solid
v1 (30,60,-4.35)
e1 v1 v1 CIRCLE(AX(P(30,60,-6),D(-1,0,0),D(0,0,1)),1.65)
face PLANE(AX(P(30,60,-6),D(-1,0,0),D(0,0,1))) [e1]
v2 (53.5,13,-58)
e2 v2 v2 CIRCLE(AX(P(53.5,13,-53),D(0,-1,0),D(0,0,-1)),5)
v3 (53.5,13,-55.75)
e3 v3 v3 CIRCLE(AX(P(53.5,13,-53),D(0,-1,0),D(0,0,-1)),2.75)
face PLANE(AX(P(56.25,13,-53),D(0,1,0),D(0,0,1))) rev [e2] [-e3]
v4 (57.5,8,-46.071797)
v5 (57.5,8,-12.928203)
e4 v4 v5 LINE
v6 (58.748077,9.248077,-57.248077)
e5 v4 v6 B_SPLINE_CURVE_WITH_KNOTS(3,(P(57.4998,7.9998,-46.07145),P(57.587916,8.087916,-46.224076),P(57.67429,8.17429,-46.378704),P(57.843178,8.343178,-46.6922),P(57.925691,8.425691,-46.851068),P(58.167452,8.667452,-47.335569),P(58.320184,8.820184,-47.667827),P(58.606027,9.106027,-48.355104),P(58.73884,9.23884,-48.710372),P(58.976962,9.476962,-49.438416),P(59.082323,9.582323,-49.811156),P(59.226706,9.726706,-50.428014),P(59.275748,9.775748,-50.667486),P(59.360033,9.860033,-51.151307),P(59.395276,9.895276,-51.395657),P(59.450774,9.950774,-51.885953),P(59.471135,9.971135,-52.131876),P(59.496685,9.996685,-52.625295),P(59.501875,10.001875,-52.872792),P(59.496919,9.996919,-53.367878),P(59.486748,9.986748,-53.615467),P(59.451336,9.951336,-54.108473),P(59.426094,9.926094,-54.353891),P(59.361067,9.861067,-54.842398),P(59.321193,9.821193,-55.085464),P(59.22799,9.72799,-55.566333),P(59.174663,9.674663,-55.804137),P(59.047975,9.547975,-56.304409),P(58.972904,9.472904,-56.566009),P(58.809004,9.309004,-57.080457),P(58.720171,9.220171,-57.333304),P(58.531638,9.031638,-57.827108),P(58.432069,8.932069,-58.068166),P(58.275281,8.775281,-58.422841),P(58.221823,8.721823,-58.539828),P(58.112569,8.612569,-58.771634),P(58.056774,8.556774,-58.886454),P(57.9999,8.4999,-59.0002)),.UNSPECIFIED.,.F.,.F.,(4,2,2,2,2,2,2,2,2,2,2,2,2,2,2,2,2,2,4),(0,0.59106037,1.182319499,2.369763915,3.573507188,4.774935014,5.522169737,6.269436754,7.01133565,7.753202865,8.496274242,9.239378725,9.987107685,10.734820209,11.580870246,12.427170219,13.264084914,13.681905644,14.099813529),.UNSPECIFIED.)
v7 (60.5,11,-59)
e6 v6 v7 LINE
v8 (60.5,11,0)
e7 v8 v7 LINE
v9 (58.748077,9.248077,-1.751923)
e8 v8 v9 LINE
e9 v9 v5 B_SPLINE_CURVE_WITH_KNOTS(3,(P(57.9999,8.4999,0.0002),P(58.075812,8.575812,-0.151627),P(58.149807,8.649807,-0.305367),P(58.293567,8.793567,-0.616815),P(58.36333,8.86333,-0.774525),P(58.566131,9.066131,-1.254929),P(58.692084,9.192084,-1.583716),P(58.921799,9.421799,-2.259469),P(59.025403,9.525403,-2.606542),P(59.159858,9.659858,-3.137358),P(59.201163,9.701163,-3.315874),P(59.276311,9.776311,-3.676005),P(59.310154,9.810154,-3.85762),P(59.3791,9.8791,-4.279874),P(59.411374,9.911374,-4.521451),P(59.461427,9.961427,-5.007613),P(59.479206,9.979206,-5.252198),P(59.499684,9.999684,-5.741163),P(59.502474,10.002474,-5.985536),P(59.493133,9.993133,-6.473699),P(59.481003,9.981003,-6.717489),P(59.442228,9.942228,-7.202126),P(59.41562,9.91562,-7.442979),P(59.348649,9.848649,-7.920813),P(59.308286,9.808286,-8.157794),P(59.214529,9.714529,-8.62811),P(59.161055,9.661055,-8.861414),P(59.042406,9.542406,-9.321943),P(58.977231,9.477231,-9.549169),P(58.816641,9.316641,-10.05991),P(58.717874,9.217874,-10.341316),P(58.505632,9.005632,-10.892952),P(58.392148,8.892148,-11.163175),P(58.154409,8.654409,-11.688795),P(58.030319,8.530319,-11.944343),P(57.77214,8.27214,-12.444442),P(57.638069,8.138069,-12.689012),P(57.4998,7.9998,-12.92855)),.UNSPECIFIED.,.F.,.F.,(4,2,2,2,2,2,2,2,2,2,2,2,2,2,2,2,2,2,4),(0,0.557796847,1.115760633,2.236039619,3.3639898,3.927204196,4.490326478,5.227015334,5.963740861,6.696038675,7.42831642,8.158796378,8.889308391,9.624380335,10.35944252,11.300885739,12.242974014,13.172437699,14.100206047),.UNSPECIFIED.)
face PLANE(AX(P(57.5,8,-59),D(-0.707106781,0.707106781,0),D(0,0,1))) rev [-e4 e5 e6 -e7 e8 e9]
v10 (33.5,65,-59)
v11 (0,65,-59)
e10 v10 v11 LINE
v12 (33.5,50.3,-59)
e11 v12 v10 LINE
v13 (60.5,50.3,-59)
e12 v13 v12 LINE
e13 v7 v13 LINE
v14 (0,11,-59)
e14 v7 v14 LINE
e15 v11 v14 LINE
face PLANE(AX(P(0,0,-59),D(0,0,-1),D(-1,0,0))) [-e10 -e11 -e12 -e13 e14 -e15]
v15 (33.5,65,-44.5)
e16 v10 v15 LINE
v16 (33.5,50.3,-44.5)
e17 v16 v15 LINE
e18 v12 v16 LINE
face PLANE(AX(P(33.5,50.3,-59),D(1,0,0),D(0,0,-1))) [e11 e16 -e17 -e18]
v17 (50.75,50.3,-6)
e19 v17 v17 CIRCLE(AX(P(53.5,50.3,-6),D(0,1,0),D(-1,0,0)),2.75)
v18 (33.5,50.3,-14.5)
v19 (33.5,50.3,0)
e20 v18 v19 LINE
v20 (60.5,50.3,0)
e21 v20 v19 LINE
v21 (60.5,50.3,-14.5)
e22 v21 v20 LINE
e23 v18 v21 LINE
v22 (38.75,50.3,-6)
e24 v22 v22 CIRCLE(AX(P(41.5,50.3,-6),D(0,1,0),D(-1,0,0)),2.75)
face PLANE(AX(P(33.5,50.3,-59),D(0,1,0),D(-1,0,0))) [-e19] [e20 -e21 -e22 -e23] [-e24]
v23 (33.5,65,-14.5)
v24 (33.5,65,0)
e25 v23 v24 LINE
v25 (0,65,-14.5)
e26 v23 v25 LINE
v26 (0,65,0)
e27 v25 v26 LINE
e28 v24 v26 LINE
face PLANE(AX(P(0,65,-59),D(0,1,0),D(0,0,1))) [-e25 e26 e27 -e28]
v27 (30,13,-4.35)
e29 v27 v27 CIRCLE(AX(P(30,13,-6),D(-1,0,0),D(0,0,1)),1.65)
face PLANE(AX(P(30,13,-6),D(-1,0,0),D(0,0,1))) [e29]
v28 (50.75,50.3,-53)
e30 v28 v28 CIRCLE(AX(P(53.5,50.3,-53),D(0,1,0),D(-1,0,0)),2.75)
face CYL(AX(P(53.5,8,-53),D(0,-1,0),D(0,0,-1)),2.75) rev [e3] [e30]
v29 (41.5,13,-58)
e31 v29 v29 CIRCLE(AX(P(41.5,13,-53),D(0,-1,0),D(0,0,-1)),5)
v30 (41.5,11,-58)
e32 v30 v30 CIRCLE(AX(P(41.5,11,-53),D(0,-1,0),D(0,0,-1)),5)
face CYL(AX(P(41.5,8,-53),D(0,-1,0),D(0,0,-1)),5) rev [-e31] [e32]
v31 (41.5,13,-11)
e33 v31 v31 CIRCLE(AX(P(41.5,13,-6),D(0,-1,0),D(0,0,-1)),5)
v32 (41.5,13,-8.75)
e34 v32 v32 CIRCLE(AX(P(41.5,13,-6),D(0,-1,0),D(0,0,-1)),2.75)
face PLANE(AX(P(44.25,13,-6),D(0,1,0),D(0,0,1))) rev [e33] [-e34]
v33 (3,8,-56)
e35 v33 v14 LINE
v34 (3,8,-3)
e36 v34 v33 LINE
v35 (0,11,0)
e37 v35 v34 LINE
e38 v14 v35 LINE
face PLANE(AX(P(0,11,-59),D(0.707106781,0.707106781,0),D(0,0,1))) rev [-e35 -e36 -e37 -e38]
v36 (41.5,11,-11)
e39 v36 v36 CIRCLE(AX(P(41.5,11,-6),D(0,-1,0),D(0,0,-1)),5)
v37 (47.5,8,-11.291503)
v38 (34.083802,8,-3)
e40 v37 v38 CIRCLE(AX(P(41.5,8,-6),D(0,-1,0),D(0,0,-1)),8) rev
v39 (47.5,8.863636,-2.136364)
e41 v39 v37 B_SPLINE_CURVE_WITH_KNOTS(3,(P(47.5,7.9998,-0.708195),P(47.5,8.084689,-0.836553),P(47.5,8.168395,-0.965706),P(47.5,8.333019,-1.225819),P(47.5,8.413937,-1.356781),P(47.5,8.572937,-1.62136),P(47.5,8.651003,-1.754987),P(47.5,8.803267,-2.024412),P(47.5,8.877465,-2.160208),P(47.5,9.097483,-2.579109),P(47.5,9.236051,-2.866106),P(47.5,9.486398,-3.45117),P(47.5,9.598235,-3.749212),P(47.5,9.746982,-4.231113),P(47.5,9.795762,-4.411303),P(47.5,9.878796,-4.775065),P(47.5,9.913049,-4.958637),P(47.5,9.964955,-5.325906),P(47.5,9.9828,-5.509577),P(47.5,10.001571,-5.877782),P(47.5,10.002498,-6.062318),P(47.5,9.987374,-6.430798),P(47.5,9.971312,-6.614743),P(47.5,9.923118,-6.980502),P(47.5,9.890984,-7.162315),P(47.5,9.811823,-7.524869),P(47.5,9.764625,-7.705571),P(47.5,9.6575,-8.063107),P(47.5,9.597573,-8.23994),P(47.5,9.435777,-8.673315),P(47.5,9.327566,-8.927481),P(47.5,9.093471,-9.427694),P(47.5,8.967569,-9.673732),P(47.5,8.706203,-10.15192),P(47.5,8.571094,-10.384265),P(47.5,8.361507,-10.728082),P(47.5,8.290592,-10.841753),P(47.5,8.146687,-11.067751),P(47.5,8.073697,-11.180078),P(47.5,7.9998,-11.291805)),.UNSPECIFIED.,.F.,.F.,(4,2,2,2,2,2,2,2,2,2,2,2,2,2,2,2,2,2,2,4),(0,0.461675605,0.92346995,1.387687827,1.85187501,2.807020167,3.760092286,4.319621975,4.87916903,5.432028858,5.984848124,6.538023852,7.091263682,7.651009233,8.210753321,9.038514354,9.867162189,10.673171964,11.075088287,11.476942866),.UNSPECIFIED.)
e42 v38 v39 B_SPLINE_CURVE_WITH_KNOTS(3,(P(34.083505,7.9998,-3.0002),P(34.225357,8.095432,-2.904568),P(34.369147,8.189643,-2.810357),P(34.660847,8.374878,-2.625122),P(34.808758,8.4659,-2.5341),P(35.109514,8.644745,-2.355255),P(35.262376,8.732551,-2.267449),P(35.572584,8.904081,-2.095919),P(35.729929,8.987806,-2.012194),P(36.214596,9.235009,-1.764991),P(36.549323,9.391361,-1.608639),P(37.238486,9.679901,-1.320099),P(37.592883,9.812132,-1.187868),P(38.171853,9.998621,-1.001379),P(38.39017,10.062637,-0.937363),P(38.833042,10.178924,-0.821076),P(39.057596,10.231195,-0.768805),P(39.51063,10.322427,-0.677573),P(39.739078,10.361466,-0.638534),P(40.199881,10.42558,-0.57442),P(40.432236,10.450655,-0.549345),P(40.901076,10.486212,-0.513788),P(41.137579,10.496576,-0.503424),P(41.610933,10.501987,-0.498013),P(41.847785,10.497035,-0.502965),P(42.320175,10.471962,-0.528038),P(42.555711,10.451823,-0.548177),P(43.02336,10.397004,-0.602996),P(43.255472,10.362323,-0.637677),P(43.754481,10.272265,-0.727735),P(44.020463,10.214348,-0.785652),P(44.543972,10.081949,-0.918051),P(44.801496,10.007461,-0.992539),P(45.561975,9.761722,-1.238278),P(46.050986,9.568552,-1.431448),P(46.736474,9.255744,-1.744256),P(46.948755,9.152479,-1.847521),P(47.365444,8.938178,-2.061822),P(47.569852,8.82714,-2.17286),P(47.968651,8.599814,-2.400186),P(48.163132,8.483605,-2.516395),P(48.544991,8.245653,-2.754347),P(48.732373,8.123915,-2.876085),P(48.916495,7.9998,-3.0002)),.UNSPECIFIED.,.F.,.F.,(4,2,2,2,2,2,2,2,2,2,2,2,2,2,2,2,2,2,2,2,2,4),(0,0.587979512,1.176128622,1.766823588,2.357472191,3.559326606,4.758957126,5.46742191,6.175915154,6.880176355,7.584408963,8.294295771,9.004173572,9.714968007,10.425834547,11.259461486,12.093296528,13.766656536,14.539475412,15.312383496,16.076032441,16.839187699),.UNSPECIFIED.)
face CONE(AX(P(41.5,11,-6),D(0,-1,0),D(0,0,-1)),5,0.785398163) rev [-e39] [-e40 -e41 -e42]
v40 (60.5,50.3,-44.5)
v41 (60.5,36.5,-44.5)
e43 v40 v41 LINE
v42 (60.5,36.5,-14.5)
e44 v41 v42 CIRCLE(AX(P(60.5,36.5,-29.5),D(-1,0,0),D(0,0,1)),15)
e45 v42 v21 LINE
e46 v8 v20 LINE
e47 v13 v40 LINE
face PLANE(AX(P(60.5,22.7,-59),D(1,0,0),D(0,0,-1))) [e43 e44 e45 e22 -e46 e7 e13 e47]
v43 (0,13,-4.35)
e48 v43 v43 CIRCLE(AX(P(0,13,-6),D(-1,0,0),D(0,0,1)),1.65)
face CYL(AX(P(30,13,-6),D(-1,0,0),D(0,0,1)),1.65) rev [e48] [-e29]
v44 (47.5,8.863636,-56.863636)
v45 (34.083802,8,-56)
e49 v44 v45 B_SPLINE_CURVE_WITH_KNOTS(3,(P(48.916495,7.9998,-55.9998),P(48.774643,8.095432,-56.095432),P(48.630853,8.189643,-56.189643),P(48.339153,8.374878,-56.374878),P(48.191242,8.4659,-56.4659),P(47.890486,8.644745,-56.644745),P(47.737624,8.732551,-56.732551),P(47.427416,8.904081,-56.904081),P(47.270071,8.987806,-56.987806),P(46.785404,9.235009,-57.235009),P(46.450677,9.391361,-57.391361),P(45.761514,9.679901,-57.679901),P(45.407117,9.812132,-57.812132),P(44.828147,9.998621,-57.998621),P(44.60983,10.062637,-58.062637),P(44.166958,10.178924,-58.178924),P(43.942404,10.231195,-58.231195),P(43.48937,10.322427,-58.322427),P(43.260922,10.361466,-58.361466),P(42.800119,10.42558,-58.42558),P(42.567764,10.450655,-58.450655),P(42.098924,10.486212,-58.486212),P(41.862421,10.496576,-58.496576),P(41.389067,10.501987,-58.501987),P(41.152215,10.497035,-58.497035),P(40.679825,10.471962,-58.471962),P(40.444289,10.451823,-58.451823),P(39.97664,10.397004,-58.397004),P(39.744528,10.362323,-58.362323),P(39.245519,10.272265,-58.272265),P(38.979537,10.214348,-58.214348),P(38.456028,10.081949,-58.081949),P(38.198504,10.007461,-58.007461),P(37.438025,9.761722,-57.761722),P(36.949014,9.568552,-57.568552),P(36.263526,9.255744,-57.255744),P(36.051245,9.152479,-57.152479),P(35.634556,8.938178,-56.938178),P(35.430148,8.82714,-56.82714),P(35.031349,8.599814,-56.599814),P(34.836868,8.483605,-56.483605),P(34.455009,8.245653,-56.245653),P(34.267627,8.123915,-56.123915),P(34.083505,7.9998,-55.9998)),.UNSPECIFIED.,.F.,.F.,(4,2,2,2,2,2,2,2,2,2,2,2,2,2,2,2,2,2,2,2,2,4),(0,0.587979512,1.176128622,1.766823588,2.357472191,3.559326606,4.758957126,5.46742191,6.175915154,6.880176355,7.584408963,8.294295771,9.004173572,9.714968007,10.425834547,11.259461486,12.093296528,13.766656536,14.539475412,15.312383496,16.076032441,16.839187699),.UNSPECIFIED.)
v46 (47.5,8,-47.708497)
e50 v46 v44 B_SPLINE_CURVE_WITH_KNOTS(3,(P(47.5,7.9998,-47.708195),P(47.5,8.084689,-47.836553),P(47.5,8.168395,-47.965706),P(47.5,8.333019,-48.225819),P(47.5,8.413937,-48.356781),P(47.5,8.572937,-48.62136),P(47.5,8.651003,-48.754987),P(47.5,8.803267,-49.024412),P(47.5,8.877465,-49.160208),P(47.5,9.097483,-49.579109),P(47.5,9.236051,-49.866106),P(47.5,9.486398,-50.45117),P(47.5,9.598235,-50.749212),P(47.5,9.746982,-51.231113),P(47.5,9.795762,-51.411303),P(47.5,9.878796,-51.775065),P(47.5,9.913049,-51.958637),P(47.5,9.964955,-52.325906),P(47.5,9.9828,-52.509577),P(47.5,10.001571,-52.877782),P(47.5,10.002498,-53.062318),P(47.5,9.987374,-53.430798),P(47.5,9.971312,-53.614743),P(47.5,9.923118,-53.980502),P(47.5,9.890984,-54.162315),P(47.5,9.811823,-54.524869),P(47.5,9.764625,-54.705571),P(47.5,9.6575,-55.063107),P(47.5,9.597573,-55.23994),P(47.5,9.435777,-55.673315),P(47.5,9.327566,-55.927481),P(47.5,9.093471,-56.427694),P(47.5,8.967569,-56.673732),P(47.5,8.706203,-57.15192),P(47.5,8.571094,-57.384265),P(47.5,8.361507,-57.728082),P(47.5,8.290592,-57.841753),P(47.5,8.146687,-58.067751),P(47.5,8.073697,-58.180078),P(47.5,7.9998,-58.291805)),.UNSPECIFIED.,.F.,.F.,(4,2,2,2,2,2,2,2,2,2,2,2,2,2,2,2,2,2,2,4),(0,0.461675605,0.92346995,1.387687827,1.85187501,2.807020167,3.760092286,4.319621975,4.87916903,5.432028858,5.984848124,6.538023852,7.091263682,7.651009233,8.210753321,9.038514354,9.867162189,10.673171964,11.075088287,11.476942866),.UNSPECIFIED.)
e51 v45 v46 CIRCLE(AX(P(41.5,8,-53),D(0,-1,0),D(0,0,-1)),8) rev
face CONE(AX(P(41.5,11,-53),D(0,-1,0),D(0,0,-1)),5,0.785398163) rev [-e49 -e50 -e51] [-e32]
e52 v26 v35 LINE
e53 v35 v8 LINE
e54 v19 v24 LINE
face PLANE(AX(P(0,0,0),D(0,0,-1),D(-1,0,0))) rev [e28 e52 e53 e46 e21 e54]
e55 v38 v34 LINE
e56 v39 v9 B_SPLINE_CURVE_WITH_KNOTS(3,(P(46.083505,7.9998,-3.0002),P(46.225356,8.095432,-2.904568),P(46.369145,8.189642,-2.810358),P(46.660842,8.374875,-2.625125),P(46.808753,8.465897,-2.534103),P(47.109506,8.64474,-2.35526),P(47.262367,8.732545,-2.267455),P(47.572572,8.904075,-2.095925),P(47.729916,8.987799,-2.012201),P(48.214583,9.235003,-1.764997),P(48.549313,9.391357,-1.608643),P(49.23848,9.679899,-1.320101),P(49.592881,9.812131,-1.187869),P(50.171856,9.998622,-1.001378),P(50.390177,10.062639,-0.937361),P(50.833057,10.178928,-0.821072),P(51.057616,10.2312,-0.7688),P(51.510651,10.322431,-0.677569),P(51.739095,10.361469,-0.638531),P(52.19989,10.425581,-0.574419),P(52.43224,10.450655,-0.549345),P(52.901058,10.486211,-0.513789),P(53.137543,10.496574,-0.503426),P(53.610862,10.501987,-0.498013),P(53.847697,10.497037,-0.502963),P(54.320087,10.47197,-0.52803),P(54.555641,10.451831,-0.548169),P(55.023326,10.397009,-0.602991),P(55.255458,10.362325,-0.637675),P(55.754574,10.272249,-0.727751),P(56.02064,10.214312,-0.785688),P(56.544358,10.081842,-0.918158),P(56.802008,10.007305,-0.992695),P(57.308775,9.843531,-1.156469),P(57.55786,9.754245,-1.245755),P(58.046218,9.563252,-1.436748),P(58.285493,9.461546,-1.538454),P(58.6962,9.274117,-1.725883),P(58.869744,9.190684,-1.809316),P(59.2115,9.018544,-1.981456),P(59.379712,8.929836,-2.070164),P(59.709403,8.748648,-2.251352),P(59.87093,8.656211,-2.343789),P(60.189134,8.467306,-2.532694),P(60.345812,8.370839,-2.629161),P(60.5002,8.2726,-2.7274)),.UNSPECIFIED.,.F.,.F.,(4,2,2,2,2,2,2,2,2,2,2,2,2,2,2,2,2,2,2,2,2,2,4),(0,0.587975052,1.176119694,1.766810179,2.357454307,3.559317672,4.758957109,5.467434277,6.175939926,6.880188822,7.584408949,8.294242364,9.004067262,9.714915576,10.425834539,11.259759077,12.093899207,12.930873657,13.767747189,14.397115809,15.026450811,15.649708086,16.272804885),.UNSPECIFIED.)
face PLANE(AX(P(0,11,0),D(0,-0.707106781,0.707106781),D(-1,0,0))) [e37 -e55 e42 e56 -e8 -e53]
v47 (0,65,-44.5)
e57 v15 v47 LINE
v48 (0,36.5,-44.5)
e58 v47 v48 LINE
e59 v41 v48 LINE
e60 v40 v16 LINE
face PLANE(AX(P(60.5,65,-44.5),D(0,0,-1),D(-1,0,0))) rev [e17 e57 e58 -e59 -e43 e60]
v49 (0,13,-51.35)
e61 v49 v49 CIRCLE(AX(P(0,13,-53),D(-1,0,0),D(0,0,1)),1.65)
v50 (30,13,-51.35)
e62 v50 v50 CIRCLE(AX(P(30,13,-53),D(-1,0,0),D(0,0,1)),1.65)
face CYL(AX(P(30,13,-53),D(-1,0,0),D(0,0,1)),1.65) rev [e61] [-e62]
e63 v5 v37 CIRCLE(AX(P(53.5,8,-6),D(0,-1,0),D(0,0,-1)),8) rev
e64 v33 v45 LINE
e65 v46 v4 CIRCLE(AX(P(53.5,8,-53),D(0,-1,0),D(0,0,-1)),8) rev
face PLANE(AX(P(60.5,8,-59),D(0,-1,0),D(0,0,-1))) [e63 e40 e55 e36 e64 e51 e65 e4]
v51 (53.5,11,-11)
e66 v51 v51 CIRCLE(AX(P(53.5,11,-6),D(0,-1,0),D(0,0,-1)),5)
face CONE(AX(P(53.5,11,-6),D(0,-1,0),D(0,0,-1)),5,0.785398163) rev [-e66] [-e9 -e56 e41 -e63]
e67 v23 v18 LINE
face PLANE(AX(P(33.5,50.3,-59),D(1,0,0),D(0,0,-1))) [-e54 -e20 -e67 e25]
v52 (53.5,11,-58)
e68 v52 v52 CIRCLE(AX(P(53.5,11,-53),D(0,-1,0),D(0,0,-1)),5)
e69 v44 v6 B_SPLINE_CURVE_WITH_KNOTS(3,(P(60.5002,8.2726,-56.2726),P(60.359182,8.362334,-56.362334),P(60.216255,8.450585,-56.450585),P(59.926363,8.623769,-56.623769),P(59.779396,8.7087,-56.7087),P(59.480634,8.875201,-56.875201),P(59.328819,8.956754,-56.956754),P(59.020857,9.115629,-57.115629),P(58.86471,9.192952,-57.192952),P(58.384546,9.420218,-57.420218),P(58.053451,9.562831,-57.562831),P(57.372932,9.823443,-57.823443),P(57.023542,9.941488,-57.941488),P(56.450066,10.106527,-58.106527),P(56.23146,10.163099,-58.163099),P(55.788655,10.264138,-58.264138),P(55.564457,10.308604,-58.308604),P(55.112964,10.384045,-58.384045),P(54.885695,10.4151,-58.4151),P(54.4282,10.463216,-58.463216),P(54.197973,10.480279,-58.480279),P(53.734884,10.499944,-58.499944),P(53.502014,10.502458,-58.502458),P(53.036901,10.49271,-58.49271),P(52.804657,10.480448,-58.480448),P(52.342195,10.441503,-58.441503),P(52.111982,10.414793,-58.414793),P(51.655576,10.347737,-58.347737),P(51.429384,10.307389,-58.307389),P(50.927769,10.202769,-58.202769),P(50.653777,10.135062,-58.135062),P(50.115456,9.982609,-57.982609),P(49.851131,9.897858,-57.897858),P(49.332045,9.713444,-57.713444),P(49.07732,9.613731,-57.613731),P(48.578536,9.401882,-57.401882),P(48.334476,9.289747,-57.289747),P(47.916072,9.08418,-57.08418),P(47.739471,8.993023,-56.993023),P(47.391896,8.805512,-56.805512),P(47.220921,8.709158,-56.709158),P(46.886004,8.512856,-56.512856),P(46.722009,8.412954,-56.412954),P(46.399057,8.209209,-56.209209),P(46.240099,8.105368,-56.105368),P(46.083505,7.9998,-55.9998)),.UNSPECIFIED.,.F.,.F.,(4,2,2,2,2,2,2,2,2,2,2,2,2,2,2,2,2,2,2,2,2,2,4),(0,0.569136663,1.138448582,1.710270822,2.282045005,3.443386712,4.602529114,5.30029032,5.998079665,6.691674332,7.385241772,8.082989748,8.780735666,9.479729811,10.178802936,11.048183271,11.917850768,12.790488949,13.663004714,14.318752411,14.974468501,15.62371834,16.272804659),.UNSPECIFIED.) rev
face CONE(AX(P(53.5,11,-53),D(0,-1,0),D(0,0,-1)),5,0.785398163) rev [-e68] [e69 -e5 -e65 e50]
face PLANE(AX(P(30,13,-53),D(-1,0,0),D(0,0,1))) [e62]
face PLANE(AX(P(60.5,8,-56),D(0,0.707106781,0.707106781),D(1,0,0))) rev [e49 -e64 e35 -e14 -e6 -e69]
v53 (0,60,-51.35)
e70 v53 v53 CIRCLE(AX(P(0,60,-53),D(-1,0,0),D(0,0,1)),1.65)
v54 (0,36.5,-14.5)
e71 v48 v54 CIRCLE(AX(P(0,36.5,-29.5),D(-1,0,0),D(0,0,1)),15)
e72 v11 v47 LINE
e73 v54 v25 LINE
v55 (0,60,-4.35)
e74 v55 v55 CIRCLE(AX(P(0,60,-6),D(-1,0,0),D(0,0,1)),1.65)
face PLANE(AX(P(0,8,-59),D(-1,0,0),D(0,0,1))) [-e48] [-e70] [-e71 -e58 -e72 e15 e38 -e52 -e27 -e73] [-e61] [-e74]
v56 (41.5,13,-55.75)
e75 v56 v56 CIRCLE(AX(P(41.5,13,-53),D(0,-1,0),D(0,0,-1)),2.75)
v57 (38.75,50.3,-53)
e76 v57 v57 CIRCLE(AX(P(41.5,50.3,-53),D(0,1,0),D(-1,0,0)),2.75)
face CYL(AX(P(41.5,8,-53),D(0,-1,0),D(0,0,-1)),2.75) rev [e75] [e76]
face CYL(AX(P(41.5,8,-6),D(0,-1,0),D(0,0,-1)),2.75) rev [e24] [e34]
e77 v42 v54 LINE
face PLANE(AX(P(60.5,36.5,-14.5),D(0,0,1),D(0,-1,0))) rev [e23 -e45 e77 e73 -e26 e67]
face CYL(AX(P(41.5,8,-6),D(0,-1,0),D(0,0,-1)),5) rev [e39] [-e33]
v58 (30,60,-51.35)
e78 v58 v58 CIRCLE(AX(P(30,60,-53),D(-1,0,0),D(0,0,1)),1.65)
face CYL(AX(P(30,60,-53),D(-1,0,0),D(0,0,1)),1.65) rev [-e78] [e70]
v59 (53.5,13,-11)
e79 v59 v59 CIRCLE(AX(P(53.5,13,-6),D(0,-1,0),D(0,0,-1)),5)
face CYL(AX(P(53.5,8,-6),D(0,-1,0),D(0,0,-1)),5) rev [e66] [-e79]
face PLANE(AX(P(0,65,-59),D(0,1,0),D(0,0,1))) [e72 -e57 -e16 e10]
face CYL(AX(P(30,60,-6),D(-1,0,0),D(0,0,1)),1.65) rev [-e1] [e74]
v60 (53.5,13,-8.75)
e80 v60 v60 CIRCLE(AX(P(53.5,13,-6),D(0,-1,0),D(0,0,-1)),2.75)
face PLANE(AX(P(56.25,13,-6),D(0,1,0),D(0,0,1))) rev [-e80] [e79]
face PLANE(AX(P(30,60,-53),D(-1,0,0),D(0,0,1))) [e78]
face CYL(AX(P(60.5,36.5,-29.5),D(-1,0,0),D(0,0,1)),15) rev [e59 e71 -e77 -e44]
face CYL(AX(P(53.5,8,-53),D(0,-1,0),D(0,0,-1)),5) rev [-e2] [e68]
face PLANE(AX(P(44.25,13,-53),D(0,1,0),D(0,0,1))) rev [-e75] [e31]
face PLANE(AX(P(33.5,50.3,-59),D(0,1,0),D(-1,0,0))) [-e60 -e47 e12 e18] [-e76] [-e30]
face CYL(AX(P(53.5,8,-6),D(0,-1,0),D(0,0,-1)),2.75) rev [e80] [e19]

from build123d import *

# Parameters (mm, degrees)
BOSS_EXTRUDE1_DEPTH            = 59
SKETCH2_R                      = 1.65
CUT_EXTRUDE1_DEPTH             = 30
CBORE_FOR_M5_SHCS1_D           = 5.5
CBORE_FOR_M5_SHCS1_DEPTH       = 98.347633298
CBORE_FOR_M5_SHCS1_CBORE_D     = 10
CBORE_FOR_M5_SHCS1_CBORE_DEPTH = 5
CBORE_FOR_M5_SHCS1_TIP         = 1.652366702
CUT_EXTRUDE2_DEPTH             = 107.612616514
CHAMFER1_SIZE                  = 3


with BuildPart() as part:
    # Sketch1 → Boss-Extrude1 (new body)
    with BuildSketch(Plane.XY):
        Polygon((60.5, 22.7), (60.5, 50.3), (58.5, 50.3), (33.5, 50.3), (33.5, 65), (10, 65), (0, 65), (0, 8), (10, 8), (33.5, 8), (60.5, 8), align=None)
    extrude(amount=-BOSS_EXTRUDE1_DEPTH)

    # Sketch2 → Cut-Extrude1 (cut)
    with BuildSketch(Plane.ZY):
        with Locations((-6, 13)):
            Circle(SKETCH2_R)
        with Locations((-6, 60)):
            Circle(SKETCH2_R)
        with Locations((-53, 13)):
            Circle(SKETCH2_R)
        with Locations((-53, 60)):
            Circle(SKETCH2_R)
    extrude(amount=-CUT_EXTRUDE1_DEPTH, mode=Mode.SUBTRACT)

    # CBORE for M5 SHCS1
    with Locations(Plane(origin=(0, 8, 0), x_dir=(-1, 0, 0), z_dir=(0, -1, 0))):
        with Locations((-53.5, 6), (-41.5, 6), (-41.5, 53), (-53.5, 53)):
            CounterBoreHole(CBORE_FOR_M5_SHCS1_D / 2, CBORE_FOR_M5_SHCS1_CBORE_D / 2, CBORE_FOR_M5_SHCS1_CBORE_DEPTH, depth=CBORE_FOR_M5_SHCS1_DEPTH)
            with Locations((0, 0, -(CBORE_FOR_M5_SHCS1_DEPTH + CBORE_FOR_M5_SHCS1_TIP / 2))):  # 118° drill point
                Cone(0, CBORE_FOR_M5_SHCS1_D / 2, CBORE_FOR_M5_SHCS1_TIP, mode=Mode.SUBTRACT)

    # Sketch7 → Cut-Extrude2 (cut, through all)
    with BuildSketch(Plane.ZY):
        with BuildLine():
            Line((-14.5, 36.5), (-14.5, 65))
            Line((-14.5, 65), (-44.5, 65))
            Line((-44.5, 65), (-44.5, 36.5))
            ThreePointArc((-44.5, 36.5), (-29.5, 21.5), (-14.5, 36.5))
        make_face()
    extrude(amount=-CUT_EXTRUDE2_DEPTH, mode=Mode.SUBTRACT)

    # Chamfer1
    # the kernel refuses this chamfer: 3 mm, written as the material it takes off along each edge
    with BuildSketch(Plane(origin=(68.215048964, 8, 0), x_dir=(0, -0.02749587661058649, -0.9996219169112968), z_dir=(-1, 0, 0))) as chamfer1_piece_1:
        Polygon((CHAMFER1_SIZE * 0.999621916911, -CHAMFER1_SIZE * 0.0274958766106), (-CHAMFER1_SIZE * 0.0274958766106, -CHAMFER1_SIZE * 0.999621916911), (0, 0), align=None)
    extrude(amount=75.930097928, mode=Mode.SUBTRACT)
    with BuildSketch(Plane(origin=(60.5, 8, 7.715048964), x_dir=(0.02749587661058678, 0.9996219169112968, 0), z_dir=(0, 0, -1)), Plane(origin=(0, 8, 7.715048964), x_dir=(0.9996219169112968, -0.02749587661058649, 0), z_dir=(0, 0, -1))) as chamfer1_piece_2:
        Polygon((CHAMFER1_SIZE * 0.999621916911, -CHAMFER1_SIZE * 0.0274958766106), (-CHAMFER1_SIZE * 0.0274958766106, -CHAMFER1_SIZE * 0.999621916911), (0, 0), align=None)
    extrude(amount=74.430097928, mode=Mode.SUBTRACT)
    with BuildSketch(Plane(origin=(-7.715048964, 8, -59), x_dir=(0, 0.9996219169112968, -0.02749587661058678), z_dir=(1, 0, 0))) as chamfer1_piece_3:
        Polygon((CHAMFER1_SIZE * 0.999621916911, CHAMFER1_SIZE * 0.0274958766106), (-CHAMFER1_SIZE * 0.0274958766106, CHAMFER1_SIZE * 0.999621916911), (0, 0), align=None)
    extrude(amount=75.930097928, mode=Mode.SUBTRACT)
    with BuildSketch(Plane(origin=(53.5, 8, -53), x_dir=(-1, 0, 0), z_dir=(0, 0, 1))) as chamfer1_piece_4:
        Polygon((5 + CHAMFER1_SIZE, 0), (5, -CHAMFER1_SIZE), (5, 0), align=None)
    revolve(axis=Axis((53.5, 8, -53), (0, -1, 0)), mode=Mode.SUBTRACT)
    with BuildSketch(Plane(origin=(41.5, 8, -53), x_dir=(-1, 0, 0), z_dir=(0, 0, 1))) as chamfer1_piece_5:
        Polygon((5 + CHAMFER1_SIZE, 0), (5, -CHAMFER1_SIZE), (5, 0), align=None)
    revolve(axis=Axis((41.5, 8, -53), (0, -1, 0)), mode=Mode.SUBTRACT)
    with BuildSketch(Plane(origin=(41.5, 8, -6), x_dir=(-1, 0, 0), z_dir=(0, 0, 1))) as chamfer1_piece_6:
        Polygon((5 + CHAMFER1_SIZE, 0), (5, -CHAMFER1_SIZE), (5, 0), align=None)
    revolve(axis=Axis((41.5, 8, -6), (0, -1, 0)), mode=Mode.SUBTRACT)
    with BuildSketch(Plane(origin=(53.5, 8, -6), x_dir=(-1, 0, 0), z_dir=(0, 0, 1))) as chamfer1_piece_7:
        Polygon((5 + CHAMFER1_SIZE, 0), (5, -CHAMFER1_SIZE), (5, 0), align=None)
    revolve(axis=Axis((53.5, 8, -6), (0, -1, 0)), mode=Mode.SUBTRACT)


solid = part.part
